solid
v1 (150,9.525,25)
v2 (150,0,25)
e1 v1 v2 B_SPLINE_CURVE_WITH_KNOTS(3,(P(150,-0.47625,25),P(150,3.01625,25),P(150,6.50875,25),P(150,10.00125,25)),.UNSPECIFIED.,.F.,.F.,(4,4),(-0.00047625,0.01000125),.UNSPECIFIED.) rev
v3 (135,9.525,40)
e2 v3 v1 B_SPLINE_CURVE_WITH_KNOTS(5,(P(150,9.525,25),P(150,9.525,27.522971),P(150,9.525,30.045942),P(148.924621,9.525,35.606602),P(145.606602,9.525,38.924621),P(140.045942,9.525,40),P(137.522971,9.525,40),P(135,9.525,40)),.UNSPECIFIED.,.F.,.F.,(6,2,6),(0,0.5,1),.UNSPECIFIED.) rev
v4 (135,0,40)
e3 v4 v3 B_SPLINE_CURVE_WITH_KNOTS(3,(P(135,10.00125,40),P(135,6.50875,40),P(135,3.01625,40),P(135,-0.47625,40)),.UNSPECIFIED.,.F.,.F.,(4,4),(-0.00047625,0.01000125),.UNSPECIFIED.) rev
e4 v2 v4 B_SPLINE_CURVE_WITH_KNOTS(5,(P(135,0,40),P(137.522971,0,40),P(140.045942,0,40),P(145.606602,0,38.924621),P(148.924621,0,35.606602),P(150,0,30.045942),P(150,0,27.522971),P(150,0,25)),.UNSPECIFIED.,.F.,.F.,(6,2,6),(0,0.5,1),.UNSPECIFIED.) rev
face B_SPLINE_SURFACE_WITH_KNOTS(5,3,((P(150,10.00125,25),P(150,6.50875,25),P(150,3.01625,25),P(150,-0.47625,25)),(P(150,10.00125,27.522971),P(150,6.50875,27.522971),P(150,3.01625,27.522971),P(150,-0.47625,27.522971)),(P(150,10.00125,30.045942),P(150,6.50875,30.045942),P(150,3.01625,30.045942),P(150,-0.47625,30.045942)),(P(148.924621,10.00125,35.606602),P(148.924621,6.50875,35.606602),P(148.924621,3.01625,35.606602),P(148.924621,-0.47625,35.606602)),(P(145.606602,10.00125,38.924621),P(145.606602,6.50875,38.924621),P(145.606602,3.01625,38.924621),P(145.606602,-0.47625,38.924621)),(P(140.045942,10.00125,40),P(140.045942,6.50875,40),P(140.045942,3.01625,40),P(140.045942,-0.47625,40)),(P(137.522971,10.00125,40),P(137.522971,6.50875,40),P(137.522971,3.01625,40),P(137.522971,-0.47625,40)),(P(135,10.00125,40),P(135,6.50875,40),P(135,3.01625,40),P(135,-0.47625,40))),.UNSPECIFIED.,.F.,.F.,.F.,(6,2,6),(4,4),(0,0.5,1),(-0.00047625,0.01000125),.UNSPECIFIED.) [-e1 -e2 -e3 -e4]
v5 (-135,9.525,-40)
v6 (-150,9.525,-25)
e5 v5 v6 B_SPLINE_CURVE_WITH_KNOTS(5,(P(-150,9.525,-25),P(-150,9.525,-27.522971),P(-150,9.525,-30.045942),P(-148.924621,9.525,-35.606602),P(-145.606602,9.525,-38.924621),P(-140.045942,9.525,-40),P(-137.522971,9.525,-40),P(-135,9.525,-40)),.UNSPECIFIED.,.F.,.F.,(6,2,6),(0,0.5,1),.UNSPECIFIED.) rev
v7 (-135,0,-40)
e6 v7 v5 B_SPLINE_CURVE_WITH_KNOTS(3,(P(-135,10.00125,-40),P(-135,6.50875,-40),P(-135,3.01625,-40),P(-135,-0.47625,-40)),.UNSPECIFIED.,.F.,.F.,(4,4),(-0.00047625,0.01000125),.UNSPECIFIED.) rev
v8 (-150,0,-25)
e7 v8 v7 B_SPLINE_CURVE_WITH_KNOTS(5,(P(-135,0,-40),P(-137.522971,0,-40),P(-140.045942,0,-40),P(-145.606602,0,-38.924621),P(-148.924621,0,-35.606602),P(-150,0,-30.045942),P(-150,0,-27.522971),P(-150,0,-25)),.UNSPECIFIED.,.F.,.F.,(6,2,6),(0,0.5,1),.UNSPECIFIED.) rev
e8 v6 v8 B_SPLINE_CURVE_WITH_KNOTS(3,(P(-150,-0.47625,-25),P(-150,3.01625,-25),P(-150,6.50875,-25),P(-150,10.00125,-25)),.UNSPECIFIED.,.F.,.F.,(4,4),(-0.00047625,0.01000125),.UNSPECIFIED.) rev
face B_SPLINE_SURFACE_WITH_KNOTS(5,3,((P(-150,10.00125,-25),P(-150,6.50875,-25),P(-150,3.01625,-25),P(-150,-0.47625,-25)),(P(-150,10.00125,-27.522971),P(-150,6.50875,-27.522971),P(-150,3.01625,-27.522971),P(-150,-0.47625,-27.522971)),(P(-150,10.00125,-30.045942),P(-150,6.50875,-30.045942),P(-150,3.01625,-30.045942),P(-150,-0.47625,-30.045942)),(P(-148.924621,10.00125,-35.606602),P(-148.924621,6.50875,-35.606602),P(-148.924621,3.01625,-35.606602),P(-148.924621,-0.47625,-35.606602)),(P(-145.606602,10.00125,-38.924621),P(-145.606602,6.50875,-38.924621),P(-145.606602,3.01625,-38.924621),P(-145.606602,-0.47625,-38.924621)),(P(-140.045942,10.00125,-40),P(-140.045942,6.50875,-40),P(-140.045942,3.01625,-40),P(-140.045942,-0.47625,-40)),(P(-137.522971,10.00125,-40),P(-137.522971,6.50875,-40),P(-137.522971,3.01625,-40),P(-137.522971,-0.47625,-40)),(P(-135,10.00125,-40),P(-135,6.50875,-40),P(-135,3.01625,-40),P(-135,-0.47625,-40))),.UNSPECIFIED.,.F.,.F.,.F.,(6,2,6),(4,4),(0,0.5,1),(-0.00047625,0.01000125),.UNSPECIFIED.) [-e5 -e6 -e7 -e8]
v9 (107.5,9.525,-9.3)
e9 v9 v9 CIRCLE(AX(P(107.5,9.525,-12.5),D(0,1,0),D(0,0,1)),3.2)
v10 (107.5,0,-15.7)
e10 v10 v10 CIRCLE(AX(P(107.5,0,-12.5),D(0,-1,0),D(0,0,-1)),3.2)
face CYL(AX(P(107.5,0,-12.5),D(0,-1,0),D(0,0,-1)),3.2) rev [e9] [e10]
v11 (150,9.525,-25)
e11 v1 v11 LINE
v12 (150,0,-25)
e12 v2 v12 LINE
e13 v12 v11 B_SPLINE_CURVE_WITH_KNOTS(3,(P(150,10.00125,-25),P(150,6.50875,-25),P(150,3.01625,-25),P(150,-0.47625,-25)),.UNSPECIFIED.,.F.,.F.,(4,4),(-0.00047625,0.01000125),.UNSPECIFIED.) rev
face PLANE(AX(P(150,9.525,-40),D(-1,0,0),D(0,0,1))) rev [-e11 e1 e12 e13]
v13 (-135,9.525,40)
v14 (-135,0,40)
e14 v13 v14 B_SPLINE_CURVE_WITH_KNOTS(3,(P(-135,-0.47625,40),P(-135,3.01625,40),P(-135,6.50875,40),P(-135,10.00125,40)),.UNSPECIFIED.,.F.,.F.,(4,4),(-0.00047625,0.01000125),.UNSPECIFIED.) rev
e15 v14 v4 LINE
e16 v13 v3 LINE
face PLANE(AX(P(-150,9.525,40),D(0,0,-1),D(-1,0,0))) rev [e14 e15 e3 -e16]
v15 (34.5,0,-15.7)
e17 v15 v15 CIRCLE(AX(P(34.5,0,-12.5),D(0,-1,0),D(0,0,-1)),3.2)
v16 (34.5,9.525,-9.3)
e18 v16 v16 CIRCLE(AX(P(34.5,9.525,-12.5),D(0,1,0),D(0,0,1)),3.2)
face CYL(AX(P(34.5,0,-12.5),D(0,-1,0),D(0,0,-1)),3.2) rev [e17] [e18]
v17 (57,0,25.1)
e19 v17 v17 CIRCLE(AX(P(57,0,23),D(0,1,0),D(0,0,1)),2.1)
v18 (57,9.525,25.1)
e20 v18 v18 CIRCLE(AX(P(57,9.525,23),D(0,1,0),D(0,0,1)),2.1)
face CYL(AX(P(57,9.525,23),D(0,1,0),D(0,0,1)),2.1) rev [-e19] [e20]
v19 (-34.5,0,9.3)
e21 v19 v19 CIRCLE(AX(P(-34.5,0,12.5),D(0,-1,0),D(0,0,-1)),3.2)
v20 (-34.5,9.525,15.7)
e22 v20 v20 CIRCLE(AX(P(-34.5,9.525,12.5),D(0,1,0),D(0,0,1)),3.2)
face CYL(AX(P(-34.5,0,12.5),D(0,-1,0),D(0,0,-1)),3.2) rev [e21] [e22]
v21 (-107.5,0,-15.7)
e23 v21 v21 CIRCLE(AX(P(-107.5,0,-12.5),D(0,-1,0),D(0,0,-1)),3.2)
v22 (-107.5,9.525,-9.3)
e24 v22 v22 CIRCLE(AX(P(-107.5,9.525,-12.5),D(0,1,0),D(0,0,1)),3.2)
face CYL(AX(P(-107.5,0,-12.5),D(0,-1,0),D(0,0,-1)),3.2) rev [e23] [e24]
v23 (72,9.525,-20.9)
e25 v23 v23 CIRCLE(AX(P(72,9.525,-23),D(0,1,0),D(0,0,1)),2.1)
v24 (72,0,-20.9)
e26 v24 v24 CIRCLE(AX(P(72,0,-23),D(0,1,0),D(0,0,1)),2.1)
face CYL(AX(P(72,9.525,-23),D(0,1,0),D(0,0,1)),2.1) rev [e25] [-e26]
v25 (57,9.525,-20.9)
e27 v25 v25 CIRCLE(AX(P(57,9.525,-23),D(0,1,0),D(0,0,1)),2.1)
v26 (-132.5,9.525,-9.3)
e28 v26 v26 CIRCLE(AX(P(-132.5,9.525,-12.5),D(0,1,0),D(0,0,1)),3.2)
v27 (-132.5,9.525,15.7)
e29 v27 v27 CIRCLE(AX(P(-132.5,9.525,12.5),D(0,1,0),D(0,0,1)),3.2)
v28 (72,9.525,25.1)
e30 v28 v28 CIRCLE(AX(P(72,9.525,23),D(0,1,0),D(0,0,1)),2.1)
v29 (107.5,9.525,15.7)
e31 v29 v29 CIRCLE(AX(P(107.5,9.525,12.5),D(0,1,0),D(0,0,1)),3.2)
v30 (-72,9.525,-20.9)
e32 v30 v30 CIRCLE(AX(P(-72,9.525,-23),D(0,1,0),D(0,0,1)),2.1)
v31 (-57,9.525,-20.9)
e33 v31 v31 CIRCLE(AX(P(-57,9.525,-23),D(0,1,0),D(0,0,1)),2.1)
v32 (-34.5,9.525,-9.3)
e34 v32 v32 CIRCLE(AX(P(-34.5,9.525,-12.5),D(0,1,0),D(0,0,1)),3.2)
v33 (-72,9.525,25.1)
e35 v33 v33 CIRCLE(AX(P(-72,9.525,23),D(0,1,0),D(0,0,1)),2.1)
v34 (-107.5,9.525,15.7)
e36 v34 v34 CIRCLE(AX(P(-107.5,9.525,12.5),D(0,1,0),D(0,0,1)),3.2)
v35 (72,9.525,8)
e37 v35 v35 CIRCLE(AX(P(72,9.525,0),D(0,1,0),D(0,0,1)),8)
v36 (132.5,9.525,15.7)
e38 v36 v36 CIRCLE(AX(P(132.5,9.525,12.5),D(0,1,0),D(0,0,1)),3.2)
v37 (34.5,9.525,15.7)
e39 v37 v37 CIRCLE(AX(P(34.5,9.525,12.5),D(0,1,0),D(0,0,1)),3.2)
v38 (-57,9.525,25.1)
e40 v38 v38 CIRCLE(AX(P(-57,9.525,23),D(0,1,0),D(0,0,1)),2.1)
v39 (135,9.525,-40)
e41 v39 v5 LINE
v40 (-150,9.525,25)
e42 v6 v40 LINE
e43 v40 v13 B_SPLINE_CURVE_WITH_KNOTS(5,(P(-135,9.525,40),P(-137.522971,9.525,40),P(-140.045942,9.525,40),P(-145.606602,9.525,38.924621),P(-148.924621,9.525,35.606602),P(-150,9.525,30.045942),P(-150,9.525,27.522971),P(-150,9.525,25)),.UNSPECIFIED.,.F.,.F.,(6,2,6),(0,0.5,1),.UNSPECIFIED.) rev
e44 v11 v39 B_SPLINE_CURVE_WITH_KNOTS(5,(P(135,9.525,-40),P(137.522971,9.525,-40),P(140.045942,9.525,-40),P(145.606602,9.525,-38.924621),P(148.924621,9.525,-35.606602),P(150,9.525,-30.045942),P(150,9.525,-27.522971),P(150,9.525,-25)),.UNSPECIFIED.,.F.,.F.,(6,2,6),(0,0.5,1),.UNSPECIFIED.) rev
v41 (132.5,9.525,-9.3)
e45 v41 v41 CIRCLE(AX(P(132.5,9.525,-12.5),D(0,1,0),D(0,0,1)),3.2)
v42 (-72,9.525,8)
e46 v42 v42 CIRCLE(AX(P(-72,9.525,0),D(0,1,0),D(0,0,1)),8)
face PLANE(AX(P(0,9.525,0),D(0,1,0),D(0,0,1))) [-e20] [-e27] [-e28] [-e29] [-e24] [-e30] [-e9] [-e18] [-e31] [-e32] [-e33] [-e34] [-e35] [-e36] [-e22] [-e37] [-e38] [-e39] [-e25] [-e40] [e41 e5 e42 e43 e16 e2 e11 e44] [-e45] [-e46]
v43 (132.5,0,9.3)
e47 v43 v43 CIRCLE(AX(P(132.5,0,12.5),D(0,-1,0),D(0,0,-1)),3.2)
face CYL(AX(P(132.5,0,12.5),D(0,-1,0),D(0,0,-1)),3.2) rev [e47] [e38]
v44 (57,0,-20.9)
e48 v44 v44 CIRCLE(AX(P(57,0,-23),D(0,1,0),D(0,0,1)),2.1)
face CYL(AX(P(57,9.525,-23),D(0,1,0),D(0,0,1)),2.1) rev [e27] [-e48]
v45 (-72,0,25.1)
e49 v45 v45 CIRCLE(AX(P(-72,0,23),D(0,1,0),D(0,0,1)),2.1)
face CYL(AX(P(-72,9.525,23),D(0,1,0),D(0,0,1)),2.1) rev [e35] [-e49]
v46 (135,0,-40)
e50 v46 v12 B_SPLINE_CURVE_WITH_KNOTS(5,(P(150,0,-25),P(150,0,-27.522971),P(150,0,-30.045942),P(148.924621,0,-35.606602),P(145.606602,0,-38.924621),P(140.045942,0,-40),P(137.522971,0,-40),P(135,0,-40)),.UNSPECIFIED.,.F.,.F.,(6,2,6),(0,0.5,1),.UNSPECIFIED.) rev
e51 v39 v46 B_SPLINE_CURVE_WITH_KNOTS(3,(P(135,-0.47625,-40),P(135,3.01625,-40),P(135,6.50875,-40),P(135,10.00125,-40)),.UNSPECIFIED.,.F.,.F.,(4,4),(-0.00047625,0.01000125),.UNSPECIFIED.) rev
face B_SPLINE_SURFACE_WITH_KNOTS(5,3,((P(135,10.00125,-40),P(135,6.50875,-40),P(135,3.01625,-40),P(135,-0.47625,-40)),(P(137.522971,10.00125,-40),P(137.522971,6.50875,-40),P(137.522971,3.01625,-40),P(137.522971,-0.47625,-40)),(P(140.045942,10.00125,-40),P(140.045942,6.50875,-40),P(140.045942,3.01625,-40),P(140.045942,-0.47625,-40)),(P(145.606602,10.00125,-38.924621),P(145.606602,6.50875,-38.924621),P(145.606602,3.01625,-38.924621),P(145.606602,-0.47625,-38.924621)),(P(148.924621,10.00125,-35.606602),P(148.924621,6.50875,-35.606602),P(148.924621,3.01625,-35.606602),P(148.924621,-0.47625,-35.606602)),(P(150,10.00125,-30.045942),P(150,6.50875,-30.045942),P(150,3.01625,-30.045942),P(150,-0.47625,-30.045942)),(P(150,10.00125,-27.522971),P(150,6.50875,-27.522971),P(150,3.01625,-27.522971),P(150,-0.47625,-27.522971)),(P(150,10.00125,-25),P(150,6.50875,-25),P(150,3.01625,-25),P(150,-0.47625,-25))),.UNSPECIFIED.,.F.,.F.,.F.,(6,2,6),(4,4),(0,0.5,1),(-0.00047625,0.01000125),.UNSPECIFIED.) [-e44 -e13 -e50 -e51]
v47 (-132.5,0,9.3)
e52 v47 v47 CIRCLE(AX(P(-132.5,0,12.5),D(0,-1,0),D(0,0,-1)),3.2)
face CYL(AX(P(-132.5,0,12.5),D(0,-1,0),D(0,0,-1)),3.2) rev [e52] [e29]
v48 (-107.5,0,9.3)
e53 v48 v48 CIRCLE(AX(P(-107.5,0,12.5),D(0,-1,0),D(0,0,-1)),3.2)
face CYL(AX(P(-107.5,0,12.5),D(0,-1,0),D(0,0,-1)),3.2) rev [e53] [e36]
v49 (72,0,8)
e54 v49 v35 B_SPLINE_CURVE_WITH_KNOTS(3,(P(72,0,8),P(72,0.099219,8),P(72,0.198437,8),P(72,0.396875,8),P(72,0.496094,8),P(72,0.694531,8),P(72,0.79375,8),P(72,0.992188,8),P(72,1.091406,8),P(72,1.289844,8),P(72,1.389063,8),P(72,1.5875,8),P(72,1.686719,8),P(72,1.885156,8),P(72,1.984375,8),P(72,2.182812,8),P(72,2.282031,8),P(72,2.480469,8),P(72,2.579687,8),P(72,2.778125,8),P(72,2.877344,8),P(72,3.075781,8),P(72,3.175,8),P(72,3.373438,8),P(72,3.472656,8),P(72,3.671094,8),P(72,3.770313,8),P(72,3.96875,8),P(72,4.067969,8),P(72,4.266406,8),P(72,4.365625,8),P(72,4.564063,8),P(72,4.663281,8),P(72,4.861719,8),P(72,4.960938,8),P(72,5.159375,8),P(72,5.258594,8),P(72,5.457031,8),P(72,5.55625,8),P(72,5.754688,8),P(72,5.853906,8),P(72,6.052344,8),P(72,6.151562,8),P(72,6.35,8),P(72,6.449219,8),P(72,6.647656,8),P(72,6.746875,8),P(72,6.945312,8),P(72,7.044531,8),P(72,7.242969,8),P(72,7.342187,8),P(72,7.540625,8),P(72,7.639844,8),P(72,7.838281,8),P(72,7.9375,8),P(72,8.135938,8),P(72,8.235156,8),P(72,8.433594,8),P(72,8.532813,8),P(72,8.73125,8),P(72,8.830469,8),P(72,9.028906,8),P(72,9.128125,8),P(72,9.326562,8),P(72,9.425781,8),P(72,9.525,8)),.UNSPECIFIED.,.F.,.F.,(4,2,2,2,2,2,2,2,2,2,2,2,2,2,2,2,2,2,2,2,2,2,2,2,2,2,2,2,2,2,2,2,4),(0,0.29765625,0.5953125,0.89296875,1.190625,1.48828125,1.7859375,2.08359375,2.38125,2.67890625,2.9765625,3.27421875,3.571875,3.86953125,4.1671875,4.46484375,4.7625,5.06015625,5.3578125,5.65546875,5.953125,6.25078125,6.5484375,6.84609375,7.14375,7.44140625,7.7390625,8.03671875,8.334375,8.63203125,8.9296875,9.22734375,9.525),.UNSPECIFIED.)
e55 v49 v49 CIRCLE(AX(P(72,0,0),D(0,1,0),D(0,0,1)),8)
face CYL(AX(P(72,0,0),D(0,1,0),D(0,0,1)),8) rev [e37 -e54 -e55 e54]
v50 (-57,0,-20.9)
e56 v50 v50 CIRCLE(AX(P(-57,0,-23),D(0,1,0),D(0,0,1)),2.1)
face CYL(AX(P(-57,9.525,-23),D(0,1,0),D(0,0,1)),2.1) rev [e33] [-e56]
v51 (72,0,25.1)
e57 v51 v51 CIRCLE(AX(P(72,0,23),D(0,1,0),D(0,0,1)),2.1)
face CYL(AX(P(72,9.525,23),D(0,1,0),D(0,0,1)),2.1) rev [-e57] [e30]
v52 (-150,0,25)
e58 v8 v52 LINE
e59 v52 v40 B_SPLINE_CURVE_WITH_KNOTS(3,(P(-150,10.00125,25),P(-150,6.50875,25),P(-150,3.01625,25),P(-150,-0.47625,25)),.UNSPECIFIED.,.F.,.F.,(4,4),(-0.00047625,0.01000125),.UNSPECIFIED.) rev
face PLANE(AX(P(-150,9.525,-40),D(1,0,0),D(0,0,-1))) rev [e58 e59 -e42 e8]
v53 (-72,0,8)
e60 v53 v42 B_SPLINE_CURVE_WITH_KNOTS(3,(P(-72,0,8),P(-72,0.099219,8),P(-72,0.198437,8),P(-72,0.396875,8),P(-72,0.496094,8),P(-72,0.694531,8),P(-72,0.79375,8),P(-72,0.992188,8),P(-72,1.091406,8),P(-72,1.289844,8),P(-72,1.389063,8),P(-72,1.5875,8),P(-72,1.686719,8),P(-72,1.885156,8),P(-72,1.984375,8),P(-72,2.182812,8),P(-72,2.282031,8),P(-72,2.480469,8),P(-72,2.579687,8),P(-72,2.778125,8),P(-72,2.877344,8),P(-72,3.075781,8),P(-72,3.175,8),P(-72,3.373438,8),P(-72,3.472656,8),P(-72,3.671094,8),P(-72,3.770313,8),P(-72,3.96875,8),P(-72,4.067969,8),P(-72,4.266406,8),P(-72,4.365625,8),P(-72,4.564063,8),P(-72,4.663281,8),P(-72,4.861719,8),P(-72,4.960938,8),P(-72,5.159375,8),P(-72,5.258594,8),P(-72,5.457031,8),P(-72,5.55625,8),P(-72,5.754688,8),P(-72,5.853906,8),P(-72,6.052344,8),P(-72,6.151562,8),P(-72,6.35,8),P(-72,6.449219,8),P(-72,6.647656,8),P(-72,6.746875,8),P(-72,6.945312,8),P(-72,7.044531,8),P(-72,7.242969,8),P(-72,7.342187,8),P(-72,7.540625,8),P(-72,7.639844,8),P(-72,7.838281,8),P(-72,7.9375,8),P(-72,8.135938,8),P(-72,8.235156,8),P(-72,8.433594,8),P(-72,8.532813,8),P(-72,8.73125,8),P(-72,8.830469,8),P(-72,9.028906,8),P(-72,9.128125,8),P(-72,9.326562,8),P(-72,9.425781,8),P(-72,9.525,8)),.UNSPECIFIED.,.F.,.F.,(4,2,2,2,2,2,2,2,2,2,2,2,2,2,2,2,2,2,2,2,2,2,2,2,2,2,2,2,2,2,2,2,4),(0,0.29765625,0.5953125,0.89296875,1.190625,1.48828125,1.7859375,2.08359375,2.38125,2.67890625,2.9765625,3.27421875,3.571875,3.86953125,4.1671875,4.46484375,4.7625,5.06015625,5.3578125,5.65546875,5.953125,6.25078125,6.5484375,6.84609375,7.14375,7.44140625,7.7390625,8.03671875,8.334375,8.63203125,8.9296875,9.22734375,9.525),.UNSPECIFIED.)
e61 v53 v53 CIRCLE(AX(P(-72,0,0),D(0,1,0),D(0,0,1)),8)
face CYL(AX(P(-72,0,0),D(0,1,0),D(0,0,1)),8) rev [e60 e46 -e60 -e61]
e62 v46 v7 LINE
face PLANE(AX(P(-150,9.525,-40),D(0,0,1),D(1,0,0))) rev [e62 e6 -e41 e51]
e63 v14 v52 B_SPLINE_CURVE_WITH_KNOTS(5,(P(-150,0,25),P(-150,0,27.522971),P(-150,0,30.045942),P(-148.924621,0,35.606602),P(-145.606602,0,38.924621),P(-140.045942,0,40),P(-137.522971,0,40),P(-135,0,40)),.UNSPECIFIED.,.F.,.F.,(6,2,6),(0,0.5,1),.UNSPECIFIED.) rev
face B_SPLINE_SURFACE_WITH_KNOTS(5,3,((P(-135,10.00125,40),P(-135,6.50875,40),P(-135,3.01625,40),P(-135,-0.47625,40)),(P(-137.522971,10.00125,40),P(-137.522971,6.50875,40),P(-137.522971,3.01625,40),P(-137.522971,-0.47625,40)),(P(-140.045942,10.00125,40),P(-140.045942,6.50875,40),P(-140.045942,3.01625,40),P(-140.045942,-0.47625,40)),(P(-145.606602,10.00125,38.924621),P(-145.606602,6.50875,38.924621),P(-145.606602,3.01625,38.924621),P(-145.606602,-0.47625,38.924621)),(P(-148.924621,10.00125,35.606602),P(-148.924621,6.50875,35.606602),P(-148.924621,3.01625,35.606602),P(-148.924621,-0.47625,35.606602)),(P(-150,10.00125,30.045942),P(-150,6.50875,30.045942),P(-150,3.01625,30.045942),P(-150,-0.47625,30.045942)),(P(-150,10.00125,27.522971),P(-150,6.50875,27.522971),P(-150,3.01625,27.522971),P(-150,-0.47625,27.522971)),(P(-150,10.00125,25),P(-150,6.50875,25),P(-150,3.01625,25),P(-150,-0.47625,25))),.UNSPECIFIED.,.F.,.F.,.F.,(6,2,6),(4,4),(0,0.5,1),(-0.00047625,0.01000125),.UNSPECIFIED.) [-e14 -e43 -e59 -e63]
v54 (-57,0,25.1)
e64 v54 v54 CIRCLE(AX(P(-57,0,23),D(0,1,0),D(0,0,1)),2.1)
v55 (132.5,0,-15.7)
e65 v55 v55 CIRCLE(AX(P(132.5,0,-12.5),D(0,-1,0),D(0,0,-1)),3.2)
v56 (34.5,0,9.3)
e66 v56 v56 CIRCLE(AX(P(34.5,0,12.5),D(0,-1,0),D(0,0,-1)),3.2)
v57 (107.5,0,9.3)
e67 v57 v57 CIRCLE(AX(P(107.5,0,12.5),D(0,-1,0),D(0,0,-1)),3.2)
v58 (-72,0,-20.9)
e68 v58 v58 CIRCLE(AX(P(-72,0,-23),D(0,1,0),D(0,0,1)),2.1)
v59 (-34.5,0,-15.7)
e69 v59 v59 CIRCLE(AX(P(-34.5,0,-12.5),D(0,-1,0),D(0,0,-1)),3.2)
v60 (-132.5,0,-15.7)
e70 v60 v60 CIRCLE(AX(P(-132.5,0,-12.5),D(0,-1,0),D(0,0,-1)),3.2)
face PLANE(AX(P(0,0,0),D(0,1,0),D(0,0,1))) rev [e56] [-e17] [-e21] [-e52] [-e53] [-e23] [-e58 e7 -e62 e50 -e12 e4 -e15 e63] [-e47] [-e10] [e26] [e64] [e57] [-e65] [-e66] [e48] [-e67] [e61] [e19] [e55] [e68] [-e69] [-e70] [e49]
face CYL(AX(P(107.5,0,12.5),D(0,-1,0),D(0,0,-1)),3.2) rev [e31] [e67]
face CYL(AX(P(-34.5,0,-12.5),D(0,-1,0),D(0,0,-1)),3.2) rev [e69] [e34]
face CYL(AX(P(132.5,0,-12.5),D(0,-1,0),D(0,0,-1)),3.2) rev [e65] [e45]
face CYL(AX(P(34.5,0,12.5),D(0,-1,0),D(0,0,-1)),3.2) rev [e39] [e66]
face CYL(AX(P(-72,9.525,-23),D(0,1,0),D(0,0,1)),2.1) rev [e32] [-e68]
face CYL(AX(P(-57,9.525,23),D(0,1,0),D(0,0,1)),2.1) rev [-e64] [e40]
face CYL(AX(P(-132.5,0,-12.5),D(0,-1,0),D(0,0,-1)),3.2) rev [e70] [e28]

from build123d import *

# Parameters (mm, degrees)
SKETCH1_W                     = 300
SKETCH1_H                     = 80
BOSS_EXTRUDE1_DEPTH           = 9.525
SKETCH5_R                     = 8
CUT_EXTRUDE1_DEPTH            = 156.533680034
FILLET1_SIZE                  = 15
M5X0_8_START                  = -1
M5X0_8_TAPPED_HOLE1_OUTLINE_R = 2.1
M5X0_8_TAPPED_HOLE1_DEPTH     = 12
M6_CLEARANCE_HOLE1_D          = 6.4


with BuildPart() as part:
    # Sketch1 → Boss-Extrude1 (new body)
    with BuildSketch(Plane(origin=(0, 0, 0), x_dir=(1, 0, 0), z_dir=(0, 1, 0))):
        Rectangle(SKETCH1_W, SKETCH1_H)
    extrude(amount=BOSS_EXTRUDE1_DEPTH)

    # Sketch5 → Cut-Extrude1 (cut, through all)
    with BuildSketch(Plane(origin=(0, 9.525, 0), x_dir=(1, 0, 0), z_dir=(0, 1, 0))):
        with Locations(Location((-72, 0, 0), (0, 0, 270))):
            Circle(SKETCH5_R)
        with Locations(Location((72, 0, 0), (0, 0, 270))):
            Circle(SKETCH5_R)
    extrude(amount=-CUT_EXTRUDE1_DEPTH, mode=Mode.SUBTRACT)

    # Fillet1
    # a fillet whose section is not a circle: 15 mm, written as the material it takes off along each edge
    with BuildSketch(Plane(origin=(150, -37.5, 40), x_dir=(0, 0, -1), z_dir=(0, 1, 0)), Plane(origin=(150, -37.5, -40), x_dir=(-1, 0, 0), z_dir=(0, 1, 0))) as fillet1_piece_1:
        with BuildLine():
            add(Edge.make_bspline([(FILLET1_SIZE, 0), (FILLET1_SIZE * 0.831801948466, 0), (FILLET1_SIZE * 0.663603896932, 0), (FILLET1_SIZE * 0.292893218813, FILLET1_SIZE * 0.0716919198361), (FILLET1_SIZE * 0.0716919198361, FILLET1_SIZE * 0.292893218813), (0, FILLET1_SIZE * 0.663603896932), (0, FILLET1_SIZE * 0.831801948466), (0, FILLET1_SIZE)], knots=[0, 0, 0, 0, 0, 0, 0.5, 0.5, 1, 1, 1, 1, 1, 1], degree=5))
            Line((0, FILLET1_SIZE), (0, 0))
            Line((0, 0), (FILLET1_SIZE, 0))
        make_face()
    extrude(amount=84.525, mode=Mode.SUBTRACT)
    with BuildSketch(Plane(origin=(-150, -37.5, -40), x_dir=(1, 0, 0), z_dir=(0, 1, 0)), Plane(origin=(-150, -37.5, 40), x_dir=(0, 0, -1), z_dir=(0, 1, 0))) as fillet1_piece_2:
        with BuildLine():
            add(Edge.make_bspline([(FILLET1_SIZE, 0), (FILLET1_SIZE * 0.831801948466, 0), (FILLET1_SIZE * 0.663603896932, 0), (FILLET1_SIZE * 0.292893218813, -FILLET1_SIZE * 0.0716919198361), (FILLET1_SIZE * 0.0716919198361, -FILLET1_SIZE * 0.292893218813), (0, -FILLET1_SIZE * 0.663603896932), (0, -FILLET1_SIZE * 0.831801948466), (0, -FILLET1_SIZE)], knots=[0, 0, 0, 0, 0, 0, 0.5, 0.5, 1, 1, 1, 1, 1, 1], degree=5))
            Line((0, -FILLET1_SIZE), (0, 0))
            Line((0, 0), (FILLET1_SIZE, 0))
        make_face()
    extrude(amount=84.525, mode=Mode.SUBTRACT)

    # M5x0.8 Tapped Hole1: read off the stored shape, not the designer's step
    # M5x0.8 Tapped Hole1 outline → M5x0.8 Tapped Hole1 (cut)
    with BuildSketch(Plane(origin=(0, 0, 0), x_dir=(1, 0, 0), z_dir=(0, 1, 0)).offset(M5X0_8_START)):
        with Locations((57, 23)):
            Circle(M5X0_8_TAPPED_HOLE1_OUTLINE_R)
        with Locations((72, -23)):
            Circle(M5X0_8_TAPPED_HOLE1_OUTLINE_R)
        with Locations((57, -23)):
            Circle(M5X0_8_TAPPED_HOLE1_OUTLINE_R)
        with Locations((72, 23)):
            Circle(M5X0_8_TAPPED_HOLE1_OUTLINE_R)
        with Locations((-57, -23)):
            Circle(M5X0_8_TAPPED_HOLE1_OUTLINE_R)
        with Locations((-72, 23)):
            Circle(M5X0_8_TAPPED_HOLE1_OUTLINE_R)
        with Locations((-57, 23)):
            Circle(M5X0_8_TAPPED_HOLE1_OUTLINE_R)
        with Locations((-72, -23)):
            Circle(M5X0_8_TAPPED_HOLE1_OUTLINE_R)
    extrude(amount=M5X0_8_TAPPED_HOLE1_DEPTH, mode=Mode.SUBTRACT)

    # M6 Clearance Hole1 (through all)
    with Locations(Plane(origin=(0, 0, 0), x_dir=(-1, 0, 0), z_dir=(0, -1, 0))):
        with Locations((132.5, -12.5), (107.5, -12.5), (132.5, 12.5), (107.5, 12.5), (-107.5, -12.5), (-107.5, 12.5), (-132.5, -12.5), (-132.5, 12.5), (34.5, -12.5), (34.5, 12.5), (-34.5, -12.5), (-34.5, 12.5)):
            Hole(M6_CLEARANCE_HOLE1_D / 2)


solid = part.part
